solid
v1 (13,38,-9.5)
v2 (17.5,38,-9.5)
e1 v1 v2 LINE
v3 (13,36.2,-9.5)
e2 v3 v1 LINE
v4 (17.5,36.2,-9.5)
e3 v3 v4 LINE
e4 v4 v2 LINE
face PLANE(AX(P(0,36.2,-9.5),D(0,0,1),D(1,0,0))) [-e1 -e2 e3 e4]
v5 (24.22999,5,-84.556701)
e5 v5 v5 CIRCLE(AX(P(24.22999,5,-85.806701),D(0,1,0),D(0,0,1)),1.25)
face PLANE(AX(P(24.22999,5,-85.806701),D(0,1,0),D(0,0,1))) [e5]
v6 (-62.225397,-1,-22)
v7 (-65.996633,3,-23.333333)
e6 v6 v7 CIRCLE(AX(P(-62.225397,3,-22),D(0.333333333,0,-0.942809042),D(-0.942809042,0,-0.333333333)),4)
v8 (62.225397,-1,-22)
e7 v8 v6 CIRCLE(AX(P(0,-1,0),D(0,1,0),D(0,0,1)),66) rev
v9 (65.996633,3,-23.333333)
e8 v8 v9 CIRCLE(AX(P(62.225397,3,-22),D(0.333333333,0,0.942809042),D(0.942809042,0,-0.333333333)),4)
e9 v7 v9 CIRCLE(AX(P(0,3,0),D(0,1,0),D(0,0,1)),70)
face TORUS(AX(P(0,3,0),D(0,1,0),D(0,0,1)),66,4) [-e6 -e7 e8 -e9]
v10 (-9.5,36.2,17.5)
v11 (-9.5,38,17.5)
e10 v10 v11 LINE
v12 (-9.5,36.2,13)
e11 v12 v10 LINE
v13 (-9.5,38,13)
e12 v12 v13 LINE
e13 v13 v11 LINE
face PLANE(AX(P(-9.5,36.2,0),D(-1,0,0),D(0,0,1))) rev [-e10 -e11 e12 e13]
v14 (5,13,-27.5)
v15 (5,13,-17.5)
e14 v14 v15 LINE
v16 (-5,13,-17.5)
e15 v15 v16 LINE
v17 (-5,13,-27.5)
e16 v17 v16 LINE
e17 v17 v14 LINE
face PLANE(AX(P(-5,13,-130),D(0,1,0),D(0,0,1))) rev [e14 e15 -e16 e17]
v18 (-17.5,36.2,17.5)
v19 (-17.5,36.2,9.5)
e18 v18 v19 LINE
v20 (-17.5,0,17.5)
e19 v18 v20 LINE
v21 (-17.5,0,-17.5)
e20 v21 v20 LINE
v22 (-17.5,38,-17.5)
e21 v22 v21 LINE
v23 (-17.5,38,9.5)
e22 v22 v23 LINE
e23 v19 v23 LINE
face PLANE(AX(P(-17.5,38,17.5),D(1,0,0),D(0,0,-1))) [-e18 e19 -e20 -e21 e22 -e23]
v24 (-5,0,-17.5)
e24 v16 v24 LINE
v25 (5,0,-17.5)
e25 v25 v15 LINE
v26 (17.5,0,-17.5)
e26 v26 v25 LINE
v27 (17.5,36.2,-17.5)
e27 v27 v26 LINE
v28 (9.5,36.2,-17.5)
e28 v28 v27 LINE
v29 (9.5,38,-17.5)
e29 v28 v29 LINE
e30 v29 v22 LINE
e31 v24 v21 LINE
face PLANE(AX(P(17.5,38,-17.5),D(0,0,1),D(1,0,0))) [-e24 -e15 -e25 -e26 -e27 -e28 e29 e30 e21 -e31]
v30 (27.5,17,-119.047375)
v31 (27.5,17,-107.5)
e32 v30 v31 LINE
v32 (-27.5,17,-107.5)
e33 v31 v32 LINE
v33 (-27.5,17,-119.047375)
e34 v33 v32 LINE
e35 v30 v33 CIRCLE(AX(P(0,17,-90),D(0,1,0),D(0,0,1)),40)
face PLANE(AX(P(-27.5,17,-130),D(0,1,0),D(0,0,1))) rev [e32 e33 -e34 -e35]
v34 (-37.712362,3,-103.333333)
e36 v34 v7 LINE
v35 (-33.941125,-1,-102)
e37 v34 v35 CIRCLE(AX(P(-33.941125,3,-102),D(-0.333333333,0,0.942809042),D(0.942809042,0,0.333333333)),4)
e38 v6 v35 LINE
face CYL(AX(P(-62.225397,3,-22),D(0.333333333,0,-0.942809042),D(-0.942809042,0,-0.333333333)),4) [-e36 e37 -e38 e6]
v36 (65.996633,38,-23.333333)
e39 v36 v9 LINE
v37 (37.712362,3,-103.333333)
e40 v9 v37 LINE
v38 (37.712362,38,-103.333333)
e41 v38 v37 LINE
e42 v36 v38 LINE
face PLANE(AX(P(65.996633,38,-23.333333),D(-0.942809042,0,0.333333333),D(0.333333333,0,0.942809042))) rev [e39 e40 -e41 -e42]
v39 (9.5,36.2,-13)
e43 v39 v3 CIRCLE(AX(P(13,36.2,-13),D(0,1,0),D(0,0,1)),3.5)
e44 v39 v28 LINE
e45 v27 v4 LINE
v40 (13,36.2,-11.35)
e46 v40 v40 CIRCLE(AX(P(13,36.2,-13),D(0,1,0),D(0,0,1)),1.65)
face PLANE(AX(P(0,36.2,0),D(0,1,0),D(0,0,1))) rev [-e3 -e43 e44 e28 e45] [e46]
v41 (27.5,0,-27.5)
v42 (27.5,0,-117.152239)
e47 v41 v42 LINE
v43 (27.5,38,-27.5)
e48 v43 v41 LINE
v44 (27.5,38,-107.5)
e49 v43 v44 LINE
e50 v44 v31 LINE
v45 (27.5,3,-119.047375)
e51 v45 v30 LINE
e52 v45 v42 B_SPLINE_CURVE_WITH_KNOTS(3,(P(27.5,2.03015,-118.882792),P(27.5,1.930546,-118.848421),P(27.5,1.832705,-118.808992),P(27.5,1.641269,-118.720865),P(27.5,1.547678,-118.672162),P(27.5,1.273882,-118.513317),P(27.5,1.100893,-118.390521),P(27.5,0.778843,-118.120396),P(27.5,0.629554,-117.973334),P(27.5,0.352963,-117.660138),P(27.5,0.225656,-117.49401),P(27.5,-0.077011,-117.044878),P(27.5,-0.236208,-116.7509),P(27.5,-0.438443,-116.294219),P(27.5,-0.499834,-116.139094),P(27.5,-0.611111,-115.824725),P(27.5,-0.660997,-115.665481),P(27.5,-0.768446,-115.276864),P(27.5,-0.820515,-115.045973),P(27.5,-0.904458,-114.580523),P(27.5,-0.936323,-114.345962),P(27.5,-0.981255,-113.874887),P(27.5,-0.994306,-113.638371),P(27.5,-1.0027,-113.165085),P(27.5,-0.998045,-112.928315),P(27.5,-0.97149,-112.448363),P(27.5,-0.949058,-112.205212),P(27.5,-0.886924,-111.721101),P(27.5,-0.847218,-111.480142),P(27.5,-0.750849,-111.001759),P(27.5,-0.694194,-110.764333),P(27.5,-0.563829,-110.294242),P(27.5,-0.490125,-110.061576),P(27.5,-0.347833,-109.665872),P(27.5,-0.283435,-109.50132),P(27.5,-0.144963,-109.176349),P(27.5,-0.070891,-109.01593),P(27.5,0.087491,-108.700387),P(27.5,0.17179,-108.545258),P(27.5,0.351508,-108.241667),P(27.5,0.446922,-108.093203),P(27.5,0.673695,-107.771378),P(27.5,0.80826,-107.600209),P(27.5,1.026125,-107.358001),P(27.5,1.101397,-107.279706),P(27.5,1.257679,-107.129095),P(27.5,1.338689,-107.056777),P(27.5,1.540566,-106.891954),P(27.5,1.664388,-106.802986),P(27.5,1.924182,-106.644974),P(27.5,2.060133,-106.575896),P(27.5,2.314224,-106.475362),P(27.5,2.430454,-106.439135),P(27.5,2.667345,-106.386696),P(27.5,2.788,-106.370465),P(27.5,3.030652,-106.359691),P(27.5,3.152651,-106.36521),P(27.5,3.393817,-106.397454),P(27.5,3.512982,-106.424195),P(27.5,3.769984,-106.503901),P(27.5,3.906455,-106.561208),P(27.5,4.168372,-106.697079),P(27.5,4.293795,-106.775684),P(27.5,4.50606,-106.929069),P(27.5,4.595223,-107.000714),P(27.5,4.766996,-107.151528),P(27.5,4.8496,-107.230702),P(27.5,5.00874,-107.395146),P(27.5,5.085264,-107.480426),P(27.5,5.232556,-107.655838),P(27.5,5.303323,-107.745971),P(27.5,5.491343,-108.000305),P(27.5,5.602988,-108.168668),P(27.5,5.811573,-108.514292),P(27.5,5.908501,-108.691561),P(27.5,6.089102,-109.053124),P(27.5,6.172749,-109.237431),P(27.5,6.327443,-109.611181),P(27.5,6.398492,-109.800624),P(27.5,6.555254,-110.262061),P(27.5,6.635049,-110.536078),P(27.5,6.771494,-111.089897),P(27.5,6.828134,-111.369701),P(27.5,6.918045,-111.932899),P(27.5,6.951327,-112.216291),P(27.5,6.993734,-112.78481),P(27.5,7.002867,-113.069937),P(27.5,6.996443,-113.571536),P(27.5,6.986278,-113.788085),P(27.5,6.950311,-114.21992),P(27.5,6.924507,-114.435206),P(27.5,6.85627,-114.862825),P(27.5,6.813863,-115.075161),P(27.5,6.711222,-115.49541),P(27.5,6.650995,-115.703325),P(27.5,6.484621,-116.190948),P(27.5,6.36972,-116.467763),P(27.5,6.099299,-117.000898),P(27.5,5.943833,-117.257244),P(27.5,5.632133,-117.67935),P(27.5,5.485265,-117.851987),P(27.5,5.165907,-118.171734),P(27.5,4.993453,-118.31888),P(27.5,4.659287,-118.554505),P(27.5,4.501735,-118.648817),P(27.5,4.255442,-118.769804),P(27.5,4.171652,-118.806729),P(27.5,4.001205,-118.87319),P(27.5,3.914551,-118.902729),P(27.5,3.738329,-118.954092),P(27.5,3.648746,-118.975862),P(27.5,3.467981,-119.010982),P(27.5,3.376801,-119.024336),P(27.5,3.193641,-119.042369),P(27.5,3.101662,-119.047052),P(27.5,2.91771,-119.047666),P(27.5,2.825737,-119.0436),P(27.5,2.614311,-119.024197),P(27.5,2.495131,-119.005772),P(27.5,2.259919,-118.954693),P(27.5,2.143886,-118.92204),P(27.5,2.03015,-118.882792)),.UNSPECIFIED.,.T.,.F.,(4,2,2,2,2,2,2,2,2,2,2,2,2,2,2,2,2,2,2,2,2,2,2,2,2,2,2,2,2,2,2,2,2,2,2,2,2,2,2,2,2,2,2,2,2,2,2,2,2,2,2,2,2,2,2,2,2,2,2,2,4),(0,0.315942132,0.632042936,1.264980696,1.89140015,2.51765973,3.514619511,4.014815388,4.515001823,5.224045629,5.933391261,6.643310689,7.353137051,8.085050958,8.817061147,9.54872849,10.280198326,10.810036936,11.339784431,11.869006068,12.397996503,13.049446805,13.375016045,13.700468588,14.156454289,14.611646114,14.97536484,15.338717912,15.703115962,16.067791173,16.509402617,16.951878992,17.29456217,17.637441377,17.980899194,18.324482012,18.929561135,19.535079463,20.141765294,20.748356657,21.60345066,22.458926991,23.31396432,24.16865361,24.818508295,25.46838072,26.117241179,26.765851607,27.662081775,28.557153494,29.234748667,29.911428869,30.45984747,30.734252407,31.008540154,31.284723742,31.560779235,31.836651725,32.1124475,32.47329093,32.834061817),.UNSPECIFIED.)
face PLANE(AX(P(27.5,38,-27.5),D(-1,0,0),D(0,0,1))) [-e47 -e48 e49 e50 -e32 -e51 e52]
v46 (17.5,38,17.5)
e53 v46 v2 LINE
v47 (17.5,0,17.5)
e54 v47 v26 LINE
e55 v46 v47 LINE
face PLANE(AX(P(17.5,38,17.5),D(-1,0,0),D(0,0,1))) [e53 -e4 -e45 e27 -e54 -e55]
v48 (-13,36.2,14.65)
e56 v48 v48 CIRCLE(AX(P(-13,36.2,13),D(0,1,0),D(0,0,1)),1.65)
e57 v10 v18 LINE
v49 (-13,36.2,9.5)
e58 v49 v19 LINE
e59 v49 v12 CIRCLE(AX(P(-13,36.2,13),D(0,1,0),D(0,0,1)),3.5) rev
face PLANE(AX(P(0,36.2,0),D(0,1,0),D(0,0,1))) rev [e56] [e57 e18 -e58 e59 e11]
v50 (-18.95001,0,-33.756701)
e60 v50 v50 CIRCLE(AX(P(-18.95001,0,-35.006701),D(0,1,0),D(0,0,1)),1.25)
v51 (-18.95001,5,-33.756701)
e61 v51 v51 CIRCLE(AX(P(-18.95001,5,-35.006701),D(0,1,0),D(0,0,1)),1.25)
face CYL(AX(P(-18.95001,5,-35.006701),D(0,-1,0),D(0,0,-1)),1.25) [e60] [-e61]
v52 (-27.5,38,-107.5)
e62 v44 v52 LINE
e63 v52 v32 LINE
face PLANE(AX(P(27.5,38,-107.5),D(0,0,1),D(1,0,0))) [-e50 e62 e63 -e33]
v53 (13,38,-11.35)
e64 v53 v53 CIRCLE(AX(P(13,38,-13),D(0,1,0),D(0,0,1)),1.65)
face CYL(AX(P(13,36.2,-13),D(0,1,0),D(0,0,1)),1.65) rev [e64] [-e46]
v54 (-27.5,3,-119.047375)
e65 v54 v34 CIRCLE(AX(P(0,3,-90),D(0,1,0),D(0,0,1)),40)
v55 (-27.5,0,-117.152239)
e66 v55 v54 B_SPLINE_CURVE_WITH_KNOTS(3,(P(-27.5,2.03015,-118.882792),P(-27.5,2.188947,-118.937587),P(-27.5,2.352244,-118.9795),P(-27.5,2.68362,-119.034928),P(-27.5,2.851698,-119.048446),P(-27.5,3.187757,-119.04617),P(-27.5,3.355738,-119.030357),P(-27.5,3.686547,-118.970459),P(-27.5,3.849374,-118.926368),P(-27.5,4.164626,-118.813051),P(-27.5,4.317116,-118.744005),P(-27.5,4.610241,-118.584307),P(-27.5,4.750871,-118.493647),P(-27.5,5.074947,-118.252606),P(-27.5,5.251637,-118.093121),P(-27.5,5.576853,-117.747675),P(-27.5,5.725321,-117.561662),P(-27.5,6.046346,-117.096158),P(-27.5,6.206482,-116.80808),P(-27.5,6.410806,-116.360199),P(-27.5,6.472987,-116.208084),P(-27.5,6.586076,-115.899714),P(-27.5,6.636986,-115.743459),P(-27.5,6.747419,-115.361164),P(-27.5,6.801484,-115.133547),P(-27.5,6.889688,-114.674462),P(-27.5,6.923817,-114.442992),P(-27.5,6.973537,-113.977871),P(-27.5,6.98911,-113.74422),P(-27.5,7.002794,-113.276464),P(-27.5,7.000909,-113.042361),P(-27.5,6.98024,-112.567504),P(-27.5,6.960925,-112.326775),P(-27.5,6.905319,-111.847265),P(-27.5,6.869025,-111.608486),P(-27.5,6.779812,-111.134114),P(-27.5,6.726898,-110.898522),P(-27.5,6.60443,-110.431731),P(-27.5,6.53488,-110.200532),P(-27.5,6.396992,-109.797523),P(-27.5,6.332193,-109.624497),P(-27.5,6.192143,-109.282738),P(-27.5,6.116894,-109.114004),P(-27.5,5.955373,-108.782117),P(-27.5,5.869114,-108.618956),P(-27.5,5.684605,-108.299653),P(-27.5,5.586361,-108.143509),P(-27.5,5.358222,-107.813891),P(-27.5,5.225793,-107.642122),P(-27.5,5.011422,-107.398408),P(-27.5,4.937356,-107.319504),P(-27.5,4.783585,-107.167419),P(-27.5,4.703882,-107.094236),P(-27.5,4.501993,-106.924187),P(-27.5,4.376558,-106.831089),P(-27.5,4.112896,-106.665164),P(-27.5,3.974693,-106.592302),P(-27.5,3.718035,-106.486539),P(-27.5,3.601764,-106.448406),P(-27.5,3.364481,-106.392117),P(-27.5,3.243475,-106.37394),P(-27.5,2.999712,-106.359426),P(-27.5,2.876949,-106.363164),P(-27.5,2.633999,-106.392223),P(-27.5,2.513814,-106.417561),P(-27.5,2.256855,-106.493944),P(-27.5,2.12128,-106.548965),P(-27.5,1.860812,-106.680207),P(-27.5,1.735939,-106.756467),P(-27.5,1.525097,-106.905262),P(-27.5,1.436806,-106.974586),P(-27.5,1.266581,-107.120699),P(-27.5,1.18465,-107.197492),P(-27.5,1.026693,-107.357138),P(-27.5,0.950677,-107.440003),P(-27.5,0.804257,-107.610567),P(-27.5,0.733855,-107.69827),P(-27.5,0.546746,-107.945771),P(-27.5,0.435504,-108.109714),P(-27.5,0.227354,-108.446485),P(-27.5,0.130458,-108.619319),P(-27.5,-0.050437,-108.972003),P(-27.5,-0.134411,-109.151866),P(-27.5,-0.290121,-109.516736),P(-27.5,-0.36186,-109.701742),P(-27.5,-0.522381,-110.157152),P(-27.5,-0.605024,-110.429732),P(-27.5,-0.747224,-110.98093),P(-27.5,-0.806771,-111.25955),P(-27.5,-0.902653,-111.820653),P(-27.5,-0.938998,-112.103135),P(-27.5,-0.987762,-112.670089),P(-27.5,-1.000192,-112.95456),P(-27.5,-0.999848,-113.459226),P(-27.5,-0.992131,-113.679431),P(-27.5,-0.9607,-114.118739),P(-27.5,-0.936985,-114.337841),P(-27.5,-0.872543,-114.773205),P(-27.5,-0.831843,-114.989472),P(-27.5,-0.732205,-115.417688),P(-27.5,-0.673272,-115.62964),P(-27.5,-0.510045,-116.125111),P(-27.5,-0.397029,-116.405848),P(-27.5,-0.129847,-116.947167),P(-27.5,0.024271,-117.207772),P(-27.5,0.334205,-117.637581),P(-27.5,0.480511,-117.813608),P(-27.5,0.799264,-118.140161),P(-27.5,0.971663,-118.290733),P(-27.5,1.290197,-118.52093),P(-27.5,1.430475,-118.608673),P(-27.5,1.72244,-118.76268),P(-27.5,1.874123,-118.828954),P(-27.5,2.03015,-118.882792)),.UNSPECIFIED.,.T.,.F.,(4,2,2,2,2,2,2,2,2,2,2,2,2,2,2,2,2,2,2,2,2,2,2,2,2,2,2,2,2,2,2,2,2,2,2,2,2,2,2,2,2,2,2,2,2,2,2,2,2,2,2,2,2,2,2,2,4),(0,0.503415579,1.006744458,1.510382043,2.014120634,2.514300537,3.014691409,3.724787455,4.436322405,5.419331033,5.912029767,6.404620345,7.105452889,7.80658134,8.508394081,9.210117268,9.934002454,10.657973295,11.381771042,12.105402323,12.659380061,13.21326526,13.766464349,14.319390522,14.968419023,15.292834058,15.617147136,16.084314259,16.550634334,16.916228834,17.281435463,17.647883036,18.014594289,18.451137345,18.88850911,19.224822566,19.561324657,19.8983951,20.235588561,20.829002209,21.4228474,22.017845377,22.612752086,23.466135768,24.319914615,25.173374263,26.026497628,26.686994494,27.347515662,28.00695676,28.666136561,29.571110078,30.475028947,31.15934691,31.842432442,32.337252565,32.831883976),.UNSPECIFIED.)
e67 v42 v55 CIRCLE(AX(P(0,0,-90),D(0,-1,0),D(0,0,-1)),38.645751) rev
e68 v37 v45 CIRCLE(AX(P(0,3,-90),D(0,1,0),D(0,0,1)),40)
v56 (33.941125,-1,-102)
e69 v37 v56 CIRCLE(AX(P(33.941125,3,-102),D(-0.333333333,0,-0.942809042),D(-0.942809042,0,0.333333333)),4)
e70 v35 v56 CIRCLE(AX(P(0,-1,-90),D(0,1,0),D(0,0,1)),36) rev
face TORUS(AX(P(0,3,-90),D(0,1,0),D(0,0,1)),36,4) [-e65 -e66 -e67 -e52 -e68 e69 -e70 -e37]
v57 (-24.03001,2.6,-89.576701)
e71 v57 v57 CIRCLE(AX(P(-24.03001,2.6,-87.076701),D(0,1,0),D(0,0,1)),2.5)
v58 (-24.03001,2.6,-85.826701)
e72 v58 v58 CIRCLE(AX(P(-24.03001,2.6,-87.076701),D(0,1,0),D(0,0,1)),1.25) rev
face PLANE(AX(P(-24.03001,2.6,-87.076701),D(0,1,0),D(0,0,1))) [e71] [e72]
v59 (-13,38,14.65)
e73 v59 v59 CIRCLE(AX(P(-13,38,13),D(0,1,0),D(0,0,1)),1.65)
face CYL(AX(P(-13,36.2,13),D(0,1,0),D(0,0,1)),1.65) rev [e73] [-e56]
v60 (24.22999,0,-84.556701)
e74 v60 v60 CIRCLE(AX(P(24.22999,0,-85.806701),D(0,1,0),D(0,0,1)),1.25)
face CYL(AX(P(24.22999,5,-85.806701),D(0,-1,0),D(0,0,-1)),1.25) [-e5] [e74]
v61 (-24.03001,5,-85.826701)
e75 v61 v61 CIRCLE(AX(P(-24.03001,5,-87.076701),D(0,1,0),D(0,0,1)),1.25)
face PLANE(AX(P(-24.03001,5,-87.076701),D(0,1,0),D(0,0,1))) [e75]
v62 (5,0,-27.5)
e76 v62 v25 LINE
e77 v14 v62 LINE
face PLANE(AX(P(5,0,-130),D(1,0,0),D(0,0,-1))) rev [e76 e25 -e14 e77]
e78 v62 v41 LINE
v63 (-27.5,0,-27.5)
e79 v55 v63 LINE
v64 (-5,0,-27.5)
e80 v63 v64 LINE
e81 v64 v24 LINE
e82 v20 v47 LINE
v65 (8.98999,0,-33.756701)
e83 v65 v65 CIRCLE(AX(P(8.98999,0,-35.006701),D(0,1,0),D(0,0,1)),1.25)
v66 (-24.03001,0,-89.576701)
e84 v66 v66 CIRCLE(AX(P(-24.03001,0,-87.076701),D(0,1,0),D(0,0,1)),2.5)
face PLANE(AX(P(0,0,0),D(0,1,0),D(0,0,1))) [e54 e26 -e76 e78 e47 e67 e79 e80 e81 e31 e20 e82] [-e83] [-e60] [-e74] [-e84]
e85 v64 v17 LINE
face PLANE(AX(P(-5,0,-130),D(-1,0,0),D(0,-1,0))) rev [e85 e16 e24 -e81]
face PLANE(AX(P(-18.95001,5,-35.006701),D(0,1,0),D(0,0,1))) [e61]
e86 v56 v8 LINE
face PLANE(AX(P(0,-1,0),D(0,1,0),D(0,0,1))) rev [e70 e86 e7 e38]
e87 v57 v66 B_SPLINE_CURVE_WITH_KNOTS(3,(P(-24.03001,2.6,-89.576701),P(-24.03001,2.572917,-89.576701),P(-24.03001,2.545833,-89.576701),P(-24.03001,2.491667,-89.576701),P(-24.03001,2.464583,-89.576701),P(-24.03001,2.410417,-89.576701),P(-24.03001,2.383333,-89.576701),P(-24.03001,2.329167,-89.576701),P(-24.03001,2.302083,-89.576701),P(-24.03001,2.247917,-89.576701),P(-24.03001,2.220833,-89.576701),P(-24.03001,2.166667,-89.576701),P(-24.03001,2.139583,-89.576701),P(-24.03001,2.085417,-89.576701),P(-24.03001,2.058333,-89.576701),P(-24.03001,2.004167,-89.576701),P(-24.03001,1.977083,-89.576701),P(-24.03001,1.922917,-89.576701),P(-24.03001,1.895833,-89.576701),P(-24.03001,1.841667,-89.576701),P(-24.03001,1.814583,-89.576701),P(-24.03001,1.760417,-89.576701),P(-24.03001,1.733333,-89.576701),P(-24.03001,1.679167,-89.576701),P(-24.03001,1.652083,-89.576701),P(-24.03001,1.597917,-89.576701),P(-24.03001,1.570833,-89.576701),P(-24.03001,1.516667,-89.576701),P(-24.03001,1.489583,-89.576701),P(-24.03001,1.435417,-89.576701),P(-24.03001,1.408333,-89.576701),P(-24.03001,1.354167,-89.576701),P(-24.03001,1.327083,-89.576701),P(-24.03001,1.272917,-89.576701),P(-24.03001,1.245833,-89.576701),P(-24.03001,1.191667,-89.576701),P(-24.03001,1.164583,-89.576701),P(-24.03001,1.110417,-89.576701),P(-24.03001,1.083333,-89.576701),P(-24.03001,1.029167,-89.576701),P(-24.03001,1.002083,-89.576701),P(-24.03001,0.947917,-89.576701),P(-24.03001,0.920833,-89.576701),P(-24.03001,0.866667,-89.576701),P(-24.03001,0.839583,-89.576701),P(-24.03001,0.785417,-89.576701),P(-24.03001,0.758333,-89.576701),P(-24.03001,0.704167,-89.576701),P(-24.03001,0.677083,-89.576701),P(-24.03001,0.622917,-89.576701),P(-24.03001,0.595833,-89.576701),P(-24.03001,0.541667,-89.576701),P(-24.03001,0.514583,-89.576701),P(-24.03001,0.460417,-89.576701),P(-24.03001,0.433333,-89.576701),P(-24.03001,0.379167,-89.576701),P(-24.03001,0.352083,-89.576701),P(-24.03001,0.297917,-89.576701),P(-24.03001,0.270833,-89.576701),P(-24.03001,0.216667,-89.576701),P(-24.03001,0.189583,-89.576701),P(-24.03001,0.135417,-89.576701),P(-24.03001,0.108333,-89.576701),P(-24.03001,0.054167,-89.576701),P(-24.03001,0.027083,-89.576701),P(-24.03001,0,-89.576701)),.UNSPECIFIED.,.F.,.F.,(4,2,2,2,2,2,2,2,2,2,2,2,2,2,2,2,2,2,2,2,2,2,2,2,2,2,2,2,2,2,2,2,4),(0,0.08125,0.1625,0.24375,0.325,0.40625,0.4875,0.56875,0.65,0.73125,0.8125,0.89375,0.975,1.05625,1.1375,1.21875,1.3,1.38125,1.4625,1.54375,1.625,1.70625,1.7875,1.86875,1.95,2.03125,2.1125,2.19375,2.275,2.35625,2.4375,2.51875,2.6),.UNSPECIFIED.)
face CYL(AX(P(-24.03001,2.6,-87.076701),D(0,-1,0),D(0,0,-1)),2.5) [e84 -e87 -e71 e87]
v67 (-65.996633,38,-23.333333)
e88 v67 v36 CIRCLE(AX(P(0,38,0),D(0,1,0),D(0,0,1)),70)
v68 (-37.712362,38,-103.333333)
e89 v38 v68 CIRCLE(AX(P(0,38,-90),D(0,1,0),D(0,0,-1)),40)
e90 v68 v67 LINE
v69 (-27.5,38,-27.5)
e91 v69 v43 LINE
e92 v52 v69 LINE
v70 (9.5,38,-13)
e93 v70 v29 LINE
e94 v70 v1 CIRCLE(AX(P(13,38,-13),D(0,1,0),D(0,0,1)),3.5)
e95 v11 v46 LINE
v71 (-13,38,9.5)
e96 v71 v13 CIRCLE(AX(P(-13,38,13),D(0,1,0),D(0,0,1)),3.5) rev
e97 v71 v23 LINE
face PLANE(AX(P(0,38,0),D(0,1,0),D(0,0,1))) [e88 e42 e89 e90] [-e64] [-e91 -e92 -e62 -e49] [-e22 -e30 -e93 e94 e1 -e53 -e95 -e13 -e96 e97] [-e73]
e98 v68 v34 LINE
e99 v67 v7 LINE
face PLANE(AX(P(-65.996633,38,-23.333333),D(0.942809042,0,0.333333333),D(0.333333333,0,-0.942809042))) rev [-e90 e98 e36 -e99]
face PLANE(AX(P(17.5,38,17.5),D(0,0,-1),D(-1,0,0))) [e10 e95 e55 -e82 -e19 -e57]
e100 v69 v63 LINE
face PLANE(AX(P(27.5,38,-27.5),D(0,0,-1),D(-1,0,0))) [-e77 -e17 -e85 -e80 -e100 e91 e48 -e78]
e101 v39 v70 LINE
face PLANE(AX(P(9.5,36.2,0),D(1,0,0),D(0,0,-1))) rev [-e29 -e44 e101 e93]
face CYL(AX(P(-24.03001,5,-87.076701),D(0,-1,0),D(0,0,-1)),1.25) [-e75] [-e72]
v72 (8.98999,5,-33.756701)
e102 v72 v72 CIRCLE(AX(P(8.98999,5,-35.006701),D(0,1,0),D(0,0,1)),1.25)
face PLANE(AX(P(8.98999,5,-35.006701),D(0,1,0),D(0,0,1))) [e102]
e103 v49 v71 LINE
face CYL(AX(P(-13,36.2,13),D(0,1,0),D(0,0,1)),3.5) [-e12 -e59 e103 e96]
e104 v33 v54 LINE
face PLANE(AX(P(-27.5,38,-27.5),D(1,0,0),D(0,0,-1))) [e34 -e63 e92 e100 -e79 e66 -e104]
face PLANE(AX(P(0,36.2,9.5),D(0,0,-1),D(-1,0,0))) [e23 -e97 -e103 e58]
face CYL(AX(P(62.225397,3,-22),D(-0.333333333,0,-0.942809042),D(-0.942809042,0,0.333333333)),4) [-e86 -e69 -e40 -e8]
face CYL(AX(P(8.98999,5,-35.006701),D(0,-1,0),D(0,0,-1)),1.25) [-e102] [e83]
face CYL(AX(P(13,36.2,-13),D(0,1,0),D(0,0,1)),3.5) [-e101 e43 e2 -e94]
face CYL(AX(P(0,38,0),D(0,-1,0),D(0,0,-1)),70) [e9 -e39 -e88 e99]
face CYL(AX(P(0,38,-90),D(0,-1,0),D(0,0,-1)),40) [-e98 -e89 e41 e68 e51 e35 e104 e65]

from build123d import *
from build123d.topology import SkipClean

# Parameters (mm, degrees)
ESQUISSE2_W             = 35
ESQUISSE2_H             = 35
ESQUISSE2_W_2           = 55
ESQUISSE2_H_2           = 80
BOSS_EXTRU_1_DEPTH      = 38
BOSS_EXTRU_2_START      = -1
BOSS_EXTRU_2_DEPTH      = 1
CONG_2_R                = 4
ESQUISSE3_W             = 55
ESQUISSE3_H             = 17
ENL_V_MAT_EXTRU_1_DEPTH = 195.551407124
ESQUISSE4_W             = 10
ESQUISSE4_H             = 13
ENL_V_MAT_EXTRU_2_DEPTH = 138.841394442
ESQUISSE5_R             = 1.65
BOSS_EXTRU_3_DEPTH      = 1.8
ESQUISSE6_R             = 2.5
BOSS_EXTRU_4_DEPTH      = 2.6
ESQUISSE6_3_R           = 1.25
BOSS_EXTRU_5_DEPTH      = 5


with BuildPart() as part:
    # Esquisse2 → Boss.-Extru.1 (new body)
    with BuildSketch(Plane(origin=(0, 0, 0), x_dir=(1, 0, 0), z_dir=(0, 1, 0))):
        with BuildLine():
            Line((-65.996632911, 23.333333333), (-37.712361663, 103.333333333))
            ThreePointArc((-37.712361663, 103.333333333), (0, 130), (37.712361663, 103.333333333))
            Line((37.712361663, 103.333333333), (65.996632911, 23.333333333))
            ThreePointArc((65.996632911, 23.333333333), (0, -70), (-65.996632911, 23.333333333))
        make_face()
        Rectangle(ESQUISSE2_W, ESQUISSE2_H, mode=Mode.SUBTRACT)
        with Locations((0, 67.5)):
            Rectangle(ESQUISSE2_W_2, ESQUISSE2_H_2, mode=Mode.SUBTRACT)
    extrude(amount=BOSS_EXTRU_1_DEPTH)

    # Esquisse2<2> → Boss.-Extru.2 (add)
    with SkipClean():  # the faces are left unmerged after this step: merging them gives an invalid solid
        with BuildSketch(Plane(origin=(0, 0, 0), x_dir=(1, 0, 0), z_dir=(0, 1, 0)).offset(BOSS_EXTRU_2_START)):
            with BuildLine():
                Line((-37.712361663, 103.333333333), (-65.996632911, 23.333333333))
                ThreePointArc((-65.996632911, 23.333333333), (0, -70), (65.996632911, 23.333333333))
                Line((65.996632911, 23.333333333), (37.712361663, 103.333333333))
                ThreePointArc((37.712361663, 103.333333333), (0, 130), (-37.712361663, 103.333333333))
            make_face()
        extrude(amount=BOSS_EXTRU_2_DEPTH)

    # Congé2
    # the kernel refuses this fillet: 4 mm, written as the material it takes off along each edge
    with BuildSketch(Plane(origin=(0, -1, 0), x_dir=(-0.9428090415820636, 0, -0.33333333333333304), z_dir=(0.33333333333333304, 0, -0.9428090415820636))) as cong_2_piece_1:
        with BuildLine():
            CenterArc((70 - CONG_2_R, CONG_2_R), CONG_2_R, 270, 90)
            Line((70 - CONG_2_R, 0), (70, 0))
            Line((70, 0), (70, CONG_2_R))
        make_face()
    revolve(axis=Axis((0, -1, 0), (0, 1, 0)), revolution_arc=218.942441269, mode=Mode.SUBTRACT)
    with BuildSketch(Plane(origin=(65.996632911, -1, -23.333333333), x_dir=(-0.9428090415820634, 0, 0.33333333333333354), z_dir=(-0.33333333333333354, 0, -0.9428090415820634))) as cong_2_piece_2:
        with BuildLine():
            CenterArc((CONG_2_R, CONG_2_R), CONG_2_R, 180, 90)
            Line((0, CONG_2_R), (0, 0))
            Line((0, 0), (CONG_2_R, 0))
        make_face()
    extrude(amount=84.852813742, mode=Mode.SUBTRACT)
    with BuildSketch(Plane(origin=(-37.712361663, -1, -103.333333333), x_dir=(0, 1, 0), z_dir=(-0.3333333333333333, 0, 0.9428090415820635))) as cong_2_piece_3:
        with BuildLine():
            CenterArc((CONG_2_R, -CONG_2_R), CONG_2_R, 90, 90)
            Line((0, -CONG_2_R), (0, 0))
            Line((0, 0), (CONG_2_R, 0))
        make_face()
    extrude(amount=84.852813742, mode=Mode.SUBTRACT)
    with BuildSketch(Plane(origin=(0, -1, -90), x_dir=(0.9428090415820632, 0, -0.3333333333333337), z_dir=(0.3333333333333337, 0, 0.9428090415820632))) as cong_2_piece_4:
        with BuildLine():
            CenterArc((40 - CONG_2_R, CONG_2_R), CONG_2_R, 270, 90)
            Line((40 - CONG_2_R, 0), (40, 0))
            Line((40, 0), (40, CONG_2_R))
        make_face()
    revolve(axis=Axis((0, -1, -90), (0, 1, 0)), revolution_arc=141.057558731, mode=Mode.SUBTRACT)

    # Esquisse3 → Enlèv. mat.-Extru.1 (cut, through all)
    with BuildSketch(Plane.XY.offset(-107.5)):
        with Locations((0, 8.5)):
            Rectangle(ESQUISSE3_W, ESQUISSE3_H)
    extrude(amount=-ENL_V_MAT_EXTRU_1_DEPTH, mode=Mode.SUBTRACT)

    # Esquisse4 → Enlèv. mat.-Extru.2 (cut, through all)
    with BuildSketch(Plane.XY.offset(-17.5)):
        with Locations((0, 6.5)):
            Rectangle(ESQUISSE4_W, ESQUISSE4_H)
    extrude(amount=-ENL_V_MAT_EXTRU_2_DEPTH, mode=Mode.SUBTRACT)

    # Esquisse5 → Boss.-Extru.3 (add)
    # profile 1 of 2: a face of its own
    with BuildSketch(Plane(origin=(0, 38, 0), x_dir=(1, 0, 0), z_dir=(0, 1, 0))):
        with BuildLine():
            Line((-9.5, -17.5), (-9.5, -13))
            ThreePointArc((-9.5, -13), (-10.525126266, -10.525126266), (-13, -9.5))
            Line((-13, -9.5), (-17.5, -9.5))
            Line((-17.5, -9.5), (-17.5, -17.5))
            Line((-17.5, -17.5), (-9.5, -17.5))
        make_face()
        with Locations(Location((-13, -13, 0), (0, 0, 270))):
            Circle(ESQUISSE5_R, mode=Mode.SUBTRACT)
    # profile 2 of 2: a face of its own
    with BuildSketch(Plane(origin=(0, 38, 0), x_dir=(1, 0, 0), z_dir=(0, 1, 0))):
        with BuildLine():
            Line((13, 9.5), (17.5, 9.5))
            Line((17.5, 9.5), (17.5, 17.5))
            Line((17.5, 17.5), (9.5, 17.5))
            Line((9.5, 17.5), (9.5, 13))
            ThreePointArc((9.5, 13), (10.525126266, 10.525126266), (13, 9.5))
        make_face()
        with Locations(Location((13, 13, 0), (0, 0, 270))):
            Circle(ESQUISSE5_R, mode=Mode.SUBTRACT)
    extrude(amount=-BOSS_EXTRU_3_DEPTH)

    # Esquisse6 → Boss.-Extru.4 (add)
    with BuildSketch(Plane(origin=(0, 0, 0), x_dir=(1, 0, 0), z_dir=(0, 1, 0))):
        with Locations(Location((-24.0300102, 87.0767006, 0), (0, 0, 90))):
            Circle(ESQUISSE6_R)
    extrude(amount=BOSS_EXTRU_4_DEPTH)

    # Esquisse6<3> → Boss.-Extru.5 (add)
    with BuildSketch(Plane(origin=(0, 0, 0), x_dir=(1, 0, 0), z_dir=(0, 1, 0))):
        with Locations(Location((-18.9500102, 35.0067006, 0), (0, 0, 270))):
            Circle(ESQUISSE6_3_R)
        with Locations(Location((8.9899898, 35.0067006, 0), (0, 0, 270))):
            Circle(ESQUISSE6_3_R)
        with Locations(Location((24.2299898, 85.8067006, 0), (0, 0, 270))):
            Circle(ESQUISSE6_3_R)
        with Locations(Location((-24.0300102, 87.0767006, 0), (0, 0, 270))):
            Circle(ESQUISSE6_3_R)
    extrude(amount=BOSS_EXTRU_5_DEPTH)


solid = part.part
